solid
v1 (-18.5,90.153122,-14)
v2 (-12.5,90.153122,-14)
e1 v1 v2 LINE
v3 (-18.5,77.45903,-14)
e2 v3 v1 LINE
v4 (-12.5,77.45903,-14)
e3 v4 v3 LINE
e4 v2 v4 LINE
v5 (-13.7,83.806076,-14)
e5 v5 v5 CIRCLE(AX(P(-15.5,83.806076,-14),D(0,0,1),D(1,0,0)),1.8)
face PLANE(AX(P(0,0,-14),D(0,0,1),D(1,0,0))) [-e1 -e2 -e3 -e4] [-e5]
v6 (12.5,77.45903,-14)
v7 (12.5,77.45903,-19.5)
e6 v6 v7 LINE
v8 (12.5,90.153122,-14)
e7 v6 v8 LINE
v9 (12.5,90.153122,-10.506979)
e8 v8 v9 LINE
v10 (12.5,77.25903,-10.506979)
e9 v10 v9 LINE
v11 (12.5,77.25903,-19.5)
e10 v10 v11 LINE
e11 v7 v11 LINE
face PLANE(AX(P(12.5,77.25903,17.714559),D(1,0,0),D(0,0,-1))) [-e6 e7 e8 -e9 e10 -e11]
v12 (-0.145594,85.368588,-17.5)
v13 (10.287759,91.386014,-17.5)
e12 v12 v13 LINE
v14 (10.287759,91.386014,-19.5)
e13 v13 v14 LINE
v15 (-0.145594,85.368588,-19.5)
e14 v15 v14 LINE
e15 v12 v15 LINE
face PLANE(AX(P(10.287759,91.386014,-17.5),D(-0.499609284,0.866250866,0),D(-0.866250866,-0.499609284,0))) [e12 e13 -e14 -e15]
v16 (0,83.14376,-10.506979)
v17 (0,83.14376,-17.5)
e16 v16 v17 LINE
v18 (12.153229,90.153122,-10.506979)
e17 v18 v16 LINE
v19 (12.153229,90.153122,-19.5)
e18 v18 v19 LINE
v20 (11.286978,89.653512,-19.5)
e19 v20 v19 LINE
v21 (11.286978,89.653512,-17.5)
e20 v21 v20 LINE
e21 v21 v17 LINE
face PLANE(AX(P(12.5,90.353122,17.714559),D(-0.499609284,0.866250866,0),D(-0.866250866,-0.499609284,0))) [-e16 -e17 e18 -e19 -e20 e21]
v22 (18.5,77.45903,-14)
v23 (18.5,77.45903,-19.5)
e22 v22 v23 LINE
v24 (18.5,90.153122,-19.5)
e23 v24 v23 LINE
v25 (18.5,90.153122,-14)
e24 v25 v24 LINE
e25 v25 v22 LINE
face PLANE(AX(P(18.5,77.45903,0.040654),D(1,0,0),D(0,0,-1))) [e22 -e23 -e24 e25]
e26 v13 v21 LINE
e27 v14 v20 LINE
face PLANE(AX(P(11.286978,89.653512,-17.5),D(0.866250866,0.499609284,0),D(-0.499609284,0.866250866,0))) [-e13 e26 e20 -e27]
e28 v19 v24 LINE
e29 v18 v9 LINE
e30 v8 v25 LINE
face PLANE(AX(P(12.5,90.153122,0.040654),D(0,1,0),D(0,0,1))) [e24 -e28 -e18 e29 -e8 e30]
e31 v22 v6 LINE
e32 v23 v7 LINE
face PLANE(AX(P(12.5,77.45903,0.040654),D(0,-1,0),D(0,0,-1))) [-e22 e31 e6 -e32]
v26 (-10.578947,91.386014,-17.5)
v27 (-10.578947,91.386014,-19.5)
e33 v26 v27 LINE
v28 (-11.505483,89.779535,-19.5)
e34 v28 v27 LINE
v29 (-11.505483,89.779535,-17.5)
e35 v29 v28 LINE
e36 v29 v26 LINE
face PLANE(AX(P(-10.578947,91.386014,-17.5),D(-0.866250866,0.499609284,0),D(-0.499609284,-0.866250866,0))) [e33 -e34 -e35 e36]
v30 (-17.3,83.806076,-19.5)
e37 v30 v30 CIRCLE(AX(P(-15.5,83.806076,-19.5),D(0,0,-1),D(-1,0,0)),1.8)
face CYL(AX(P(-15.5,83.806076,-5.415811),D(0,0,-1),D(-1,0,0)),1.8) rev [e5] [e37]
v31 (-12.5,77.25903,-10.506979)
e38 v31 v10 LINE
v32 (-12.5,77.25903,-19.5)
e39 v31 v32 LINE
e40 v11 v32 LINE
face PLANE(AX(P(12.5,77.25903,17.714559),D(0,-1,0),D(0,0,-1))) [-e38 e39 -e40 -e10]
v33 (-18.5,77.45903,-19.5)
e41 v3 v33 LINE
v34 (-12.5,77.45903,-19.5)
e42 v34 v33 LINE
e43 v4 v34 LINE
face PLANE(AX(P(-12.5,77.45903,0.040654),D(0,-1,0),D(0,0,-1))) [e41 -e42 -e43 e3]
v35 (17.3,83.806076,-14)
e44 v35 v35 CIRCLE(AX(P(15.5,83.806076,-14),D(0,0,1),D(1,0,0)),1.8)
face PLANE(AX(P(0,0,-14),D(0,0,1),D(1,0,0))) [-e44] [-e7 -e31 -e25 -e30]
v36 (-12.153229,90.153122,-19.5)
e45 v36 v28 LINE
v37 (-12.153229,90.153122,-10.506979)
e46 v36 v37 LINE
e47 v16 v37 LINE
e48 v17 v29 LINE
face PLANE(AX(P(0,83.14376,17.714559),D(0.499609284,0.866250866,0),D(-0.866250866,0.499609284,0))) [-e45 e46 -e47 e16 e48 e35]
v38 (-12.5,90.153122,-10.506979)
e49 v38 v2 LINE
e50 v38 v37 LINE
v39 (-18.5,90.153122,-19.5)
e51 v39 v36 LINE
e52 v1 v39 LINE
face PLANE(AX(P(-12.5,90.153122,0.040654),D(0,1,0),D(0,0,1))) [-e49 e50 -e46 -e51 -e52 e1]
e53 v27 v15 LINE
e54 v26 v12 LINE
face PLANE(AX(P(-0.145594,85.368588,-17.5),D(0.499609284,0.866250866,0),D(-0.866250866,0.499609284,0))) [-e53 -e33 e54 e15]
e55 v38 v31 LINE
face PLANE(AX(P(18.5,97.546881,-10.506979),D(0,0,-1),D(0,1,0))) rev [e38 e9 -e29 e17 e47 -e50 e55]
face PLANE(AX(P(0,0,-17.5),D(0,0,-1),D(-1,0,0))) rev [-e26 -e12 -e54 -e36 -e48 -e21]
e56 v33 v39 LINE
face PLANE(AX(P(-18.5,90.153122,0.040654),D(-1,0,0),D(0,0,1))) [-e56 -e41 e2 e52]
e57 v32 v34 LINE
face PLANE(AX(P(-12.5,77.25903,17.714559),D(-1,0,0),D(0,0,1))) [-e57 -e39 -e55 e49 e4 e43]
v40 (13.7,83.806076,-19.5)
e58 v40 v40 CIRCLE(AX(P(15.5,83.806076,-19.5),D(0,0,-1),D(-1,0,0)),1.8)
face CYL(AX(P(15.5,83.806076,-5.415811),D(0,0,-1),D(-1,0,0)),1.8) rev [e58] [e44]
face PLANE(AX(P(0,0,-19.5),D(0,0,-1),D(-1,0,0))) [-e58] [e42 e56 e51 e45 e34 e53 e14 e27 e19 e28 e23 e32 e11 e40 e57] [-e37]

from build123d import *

# Parameters (mm, degrees)
SKETCH2_R               = 18.5
SKETCH2_R_2             = 1.8
BOSS_EXTRUDE1_DEPTH     = 3
SKETCH3_R               = 6.5
CUT_EXTRUDE1_DEPTH      = 3
BOSS_EXTRUDE2_START     = -3
BOSS_EXTRUDE2_DEPTH     = 3
SKETCH5_W               = 37
SKETCH5_H               = 5
BOSS_EXTRUDE3_DEPTH     = 90
SKETCH6_W               = 37
SKETCH6_H               = 15.5
BOSS_EXTRUDE4_DEPTH     = 5
SKETCH7_W               = 6
SKETCH7_H               = 20.5
BOSS_EXTRUDE5_DEPTH     = 20
SKETCH8_W               = 25
SKETCH8_H               = 15.5
CUT_EXTRUDE2_DEPTH      = 10
SKETCH9_W               = 25
SKETCH9_H               = 5
BOSS_EXTRUDE6_DEPTH     = 20
BOSS_EXTRUDE7_REACH     = 128.813
SKETCH10_W              = 5
SKETCH10_H              = 25
SKETCH11_W              = 25
SKETCH11_H              = 20
CUT_EXTRUDE3_DEPTH      = 137.880422267
SKETCH13_W              = 13
SKETCH13_H              = 60
CUT_EXTRUDE5_DEPTH      = 127.957670111
BOSS_EXTRUDE8_DEPTH     = 35
SKETCH16_W              = 37
SKETCH16_H              = 8
BOSS_EXTRUDE9_DEPTH     = 13
SKETCH17_W              = 37
SKETCH17_H              = 8
BOSS_EXTRUDE10_DEPTH    = 13
FILLET1_START           = -18.5
FILLET1_DEPTH           = 37
FILLET2_R               = 8
SKETCH18_W              = 37
SKETCH18_H              = 75
CUT_EXTRUDE6_DEPTH      = 0.001
SKETCH19_R              = 1.8
CUT_EXTRUDE7_DEPTH      = 6
SKETCH20_W              = 7
SKETCH20_H              = 5
CUT_EXTRUDE8_DEPTH      = 20
CUT_EXTRUDE9_DEPTH      = 127.957670111
CUT_EXTRUDE9_DEPTH_BACK = 127.957670111
CUT_EXTRUDE10_DEPTH     = 137.880422267
CUT_EXTRUDE11_DEPTH     = 15
BOSS_EXTRUDE11_DEPTH    = 7.5
BOSS_EXTRUDE12_DEPTH    = 7.5
SKETCH27_W              = 27
SKETCH27_H              = 53
CUT_EXTRUDE13_DEPTH     = 10
BOSS_EXTRUDE13_DEPTH    = 6.9930205
SKETCH29_W              = 6
SKETCH29_H              = 13.094091563
CUT_EXTRUDE14_DEPTH     = 3.5
SKETCH30_W              = 6
SKETCH30_H              = 12.694091563
BOSS_EXTRUDE14_DEPTH    = 3.5
CUT_EXTRUDE15_REACH     = 128.958
SKETCH31_W              = 3.5
SKETCH31_H              = 13.094091563
CUT_EXTRUDE16_START     = -6.993021
SKETCH32_R              = 1.8
CUT_EXTRUDE16_DEPTH     = 6.993021
SKETCH33_R              = 1.8
CUT_EXTRUDE17_DEPTH     = 3.4930205
SKETCH34_R              = 1.8
BOSS_EXTRUDE15_DEPTH    = 2
SKETCH35_W              = 37
SKETCH35_H              = 8.9930205
CUT_EXTRUDE18_DEPTH     = 2
BOSS_EXTRUDE16_DEPTH    = 2


with BuildPart() as part:
    # Sketch2 → Boss-Extrude1 (new body)
    with BuildSketch(Plane(origin=(0, 0, 0), x_dir=(1, 0, 0), z_dir=(0, 1, 0))):
        with Locations(Location((0, 0, 0), (0, 0, 270))):
            Circle(SKETCH2_R)
        with Locations(Location((-15.5, 0, 0), (0, 0, 270))):
            Circle(SKETCH2_R_2, mode=Mode.SUBTRACT)
        with Locations(Location((-7.75, 13.423393759, 0), (0, 0, 270))):
            Circle(SKETCH2_R_2, mode=Mode.SUBTRACT)
        with Locations(Location((7.75, 13.423393759, 0), (0, 0, 270))):
            Circle(SKETCH2_R_2, mode=Mode.SUBTRACT)
        with Locations(Location((15.5, 0, 0), (0, 0, 270))):
            Circle(SKETCH2_R_2, mode=Mode.SUBTRACT)
        with Locations(Location((7.75, -13.423393759, 0), (0, 0, 270))):
            Circle(SKETCH2_R_2, mode=Mode.SUBTRACT)
        with Locations(Location((-7.75, -13.423393759, 0), (0, 0, 270))):
            Circle(SKETCH2_R_2, mode=Mode.SUBTRACT)
    extrude(amount=BOSS_EXTRUDE1_DEPTH)

    # Sketch3 → Cut-Extrude1 (cut)
    with BuildSketch(Plane(origin=(0, 3, 0), x_dir=(1, 0, 0), z_dir=(0, 1, 0))):
        with Locations(Location((0, -7, 0), (0, 0, 270))):
            Circle(SKETCH3_R)
    extrude(amount=-CUT_EXTRUDE1_DEPTH, mode=Mode.SUBTRACT)

    # Sketch4 → Boss-Extrude2 (add)
    with BuildSketch(Plane(origin=(0, 3, 0), x_dir=(1, 0, 0), z_dir=(0, 1, 0)).offset(BOSS_EXTRUDE2_START)):
        with BuildLine():
            Line((18.5, 30.5), (-18.5, 30.5))
            Line((-18.5, 30.5), (-18.5, 0))
            ThreePointArc((-18.5, 0), (0, 18.5), (18.5, 0))
            Line((18.5, 0), (18.5, 30.5))
        make_face()
        with BuildLine():
            ThreePointArc((18.5, 0), (0, -18.5), (-18.5, 0))
            Line((-18.5, 0), (-18.5, -44.5))
            Line((-18.5, -44.5), (18.5, -44.5))
            Line((18.5, -44.5), (18.5, 0))
        make_face()
    extrude(amount=BOSS_EXTRUDE2_DEPTH)

    # Sketch5 → Boss-Extrude3 (add)
    with BuildSketch(Plane(origin=(0, 3, 0), x_dir=(1, 0, 0), z_dir=(0, 1, 0))):
        with Locations((0, 28)):
            Rectangle(SKETCH5_W, SKETCH5_H)
        with Locations((0, -42)):
            Rectangle(SKETCH5_W, SKETCH5_H)
    extrude(amount=BOSS_EXTRUDE3_DEPTH)

    # Sketch6 → Boss-Extrude4 (add)
    with BuildSketch(Plane(origin=(0, 93, 0), x_dir=(1, 0, 0), z_dir=(0, 1, 0))):
        with Locations((0, 17.75)):
            Rectangle(SKETCH6_W, SKETCH6_H)
        with Locations((0, -31.75)):
            Rectangle(SKETCH6_W, SKETCH6_H)
    extrude(amount=-BOSS_EXTRUDE4_DEPTH)

    # Sketch7 → Boss-Extrude5 (add)
    with BuildSketch(Plane(origin=(0, 93, 0), x_dir=(1, 0, 0), z_dir=(0, 1, 0))):
        with Locations((-15.5, 20.25)):
            Rectangle(SKETCH7_W, SKETCH7_H)
        with Locations((15.5, 20.25)):
            Rectangle(SKETCH7_W, SKETCH7_H)
        with Locations((-15.5, -34.25)):
            Rectangle(SKETCH7_W, SKETCH7_H)
        with Locations((15.5, -34.25)):
            Rectangle(SKETCH7_W, SKETCH7_H)
    extrude(amount=BOSS_EXTRUDE5_DEPTH)

    # Sketch8 → Cut-Extrude2 (cut)
    with BuildSketch(Plane(origin=(0, 93, 0), x_dir=(1, 0, 0), z_dir=(0, 1, 0))):
        with Locations((0, 17.75)):
            Rectangle(SKETCH8_W, SKETCH8_H)
        with Locations((0, -31.75)):
            Rectangle(SKETCH8_W, SKETCH8_H)
    extrude(amount=-CUT_EXTRUDE2_DEPTH, mode=Mode.SUBTRACT)

    # Sketch9 → Boss-Extrude6 (add)
    with BuildSketch(Plane(origin=(0, 93, 0), x_dir=(1, 0, 0), z_dir=(0, 1, 0))):
        with Locations((0, 28)):
            Rectangle(SKETCH9_W, SKETCH9_H)
        with Locations((0, -42)):
            Rectangle(SKETCH9_W, SKETCH9_H)
    extrude(amount=BOSS_EXTRUDE6_DEPTH)

    # Sketch10 → Boss-Extrude7 (add, up to next)
    with BuildSketch(Plane(origin=(0, 0, 24), x_dir=(-1, 0, 0), z_dir=(0, 0, -1)), mode=Mode.PRIVATE) as boss_extrude7_sk1:
        with Locations((16, 100.5)):
            Rectangle(SKETCH10_W, SKETCH10_H)
    boss_extrude7_tool1 = extrude(boss_extrude7_sk1.sketch, amount=BOSS_EXTRUDE7_REACH, mode=Mode.PRIVATE) - part.part
    # Sketch10 → Boss-Extrude7 (add, up to next)
    with BuildSketch(Plane(origin=(0, 0, 24), x_dir=(-1, 0, 0), z_dir=(0, 0, -1)), mode=Mode.PRIVATE) as boss_extrude7_sk2:
        with Locations((-16, 100.5)):
            Rectangle(SKETCH10_W, SKETCH10_H)
    boss_extrude7_tool2 = extrude(boss_extrude7_sk2.sketch, amount=BOSS_EXTRUDE7_REACH, mode=Mode.PRIVATE) - part.part
    add(boss_extrude7_tool1.solids().sort_by_distance((-16, 100.5, 24))[0])
    add(boss_extrude7_tool2.solids().sort_by_distance((16, 100.5, 24))[0])

    # Sketch11 → Cut-Extrude3 (cut, through all)
    with BuildSketch(Plane.XY.offset(44.5)):
        with Locations((0, 103)):
            Rectangle(SKETCH11_W, SKETCH11_H)
    extrude(amount=-CUT_EXTRUDE3_DEPTH, mode=Mode.SUBTRACT)

    # Sketch13 → Cut-Extrude5 (cut, through all)
    with BuildSketch(Plane(origin=(18.5, 0, 0), x_dir=(0, 0, -1), z_dir=(1, 0, 0))):
        with Locations((-38, 83)):
            Rectangle(SKETCH13_W, SKETCH13_H)
        with Locations((24, 83)):
            Rectangle(SKETCH13_W, SKETCH13_H)
    extrude(amount=-CUT_EXTRUDE5_DEPTH, mode=Mode.SUBTRACT)


with BuildPart() as cut_extrude5_piece_1:
    # of the separate pieces the step leaves, piece 1, a body of its own (cut_extrude5_pieces)
    add(part.part.solids().sort_by_distance((-7.75, 0, 15.223393759))[0])



with BuildPart() as cut_extrude5_piece_2:
    # of the separate pieces the step leaves, piece 2, a body of its own (cut_extrude5_pieces)
    add(part.part.solids().sort_by_distance((-18.5, 113, 31.5))[0])



with BuildPart() as cut_extrude5_piece_3:
    # of the separate pieces the step leaves, piece 3, a body of its own (cut_extrude5_pieces)
    add(part.part.solids().sort_by_distance((18.5, 113, 31.5))[0])


with BuildPart() as cut_extrude5_piece_2_1:
    add(cut_extrude5_piece_2.part)

    add(cut_extrude5_piece_3.part)  # Boss-Extrude8 merges Cut-Extrude5 piece 3
    # Sketch14 → Boss-Extrude8 (add)
    with BuildSketch(Plane.XZ.offset(-88)):
        Polygon((18.5, -17.5), (18.5, 31.5), (12.5, 31.5), (12.5, 24), (13.5, 24), (13.5, -10), (12.5, -10), (12.5, -17.5), align=None)
        Polygon((-12.5, 31.5), (-18.5, 31.5), (-18.5, -17.5), (-12.5, -17.5), (-12.5, -10), (-13.5, -10), (-13.5, 24), (-12.5, 24), align=None)
    extrude(amount=BOSS_EXTRUDE8_DEPTH)


with BuildPart() as cut_extrude5_piece_1_1:
    add(cut_extrude5_piece_1.part)

    add(cut_extrude5_piece_2_1.part)  # Boss-Extrude9 merges Cut-Extrude5 piece 2
    # Sketch16 → Boss-Extrude9 (add)
    with BuildSketch(Plane.XY.offset(31.5)):
        with Locations((0, 57)):
            Rectangle(SKETCH16_W, SKETCH16_H)
    extrude(amount=BOSS_EXTRUDE9_DEPTH)

    # Sketch17 → Boss-Extrude10 (add)
    with BuildSketch(Plane(origin=(0, 0, -17.5), x_dir=(-1, 0, 0), z_dir=(0, 0, -1))):
        with Locations((0, 57)):
            Rectangle(SKETCH17_W, SKETCH17_H)
    extrude(amount=BOSS_EXTRUDE10_DEPTH)

    # Fillet1: read off the stored shape, not the designer's step
    # Fillet1 outline → Fillet1 (add)
    with BuildSketch(Plane.YZ.offset(FILLET1_START)):
        with BuildLine():
            ThreePointArc((45, 39.5), (50.656854249, 37.156854249), (53, 31.5))
            Line((53, 31.5), (53, 39.5))
            Line((53, 39.5), (45, 39.5))
        make_face()
        with BuildLine():
            ThreePointArc((53, -17.5), (50.656854249, -23.156854249), (45, -25.5))
            Line((45, -25.5), (53, -25.5))
            Line((53, -25.5), (53, -17.5))
        make_face()
    extrude(amount=FILLET1_DEPTH)

    # Fillet2
    fillet2_edges = [cut_extrude5_piece_1_1.edges().sort_by_distance(p)[0] for p in [
        (15.5, 61, 31.5),
        (-15.5, 61, 31.5),
        (-15.5, 61, -17.5),
        (15.5, 61, -17.5),
    ]]
    fillet(fillet2_edges, radius=FILLET2_R)

    # Sketch18 → Cut-Extrude6 (cut)
    with BuildSketch(Plane(origin=(0, 3, 0), x_dir=(1, 0, 0), z_dir=(0, 1, 0))):
        with Locations((0, -7)):
            Rectangle(SKETCH18_W, SKETCH18_H)
    extrude(amount=CUT_EXTRUDE6_DEPTH, mode=Mode.SUBTRACT)


with BuildPart() as cut_extrude6_piece_1:
    # of the separate pieces the step leaves, piece 1, a body of its own (cut_extrude6_pieces)
    add(cut_extrude5_piece_1_1.part.solids().sort_by_distance((18.5, 61, 39.5))[0])


with BuildPart() as cut_extrude6_piece_2:
    # of the separate pieces the step leaves, piece 2, a body of its own (cut_extrude6_pieces)
    add(cut_extrude5_piece_1_1.part.solids().sort_by_distance((18.5, 3, 44.5))[0])


with BuildPart() as cut_extrude7_tool:
    # Sketch19 → Cut-Extrude7 (new body)
    with BuildSketch(Plane.XZ):
        with Locations(Location((-10, 42, 0), (0, 0, 270))):
            Circle(SKETCH19_R)
        with Locations(Location((10, 42, 0), (0, 0, 270))):
            Circle(SKETCH19_R)
        with Locations(Location((-10, -28, 0), (0, 0, 270))):
            Circle(SKETCH19_R)
        with Locations(Location((10, -28, 0), (0, 0, 270))):
            Circle(SKETCH19_R)
    extrude(amount=-CUT_EXTRUDE7_DEPTH)


with BuildPart() as cut_extrude6_piece_1_1:
    add(cut_extrude6_piece_1.part)

    # Cut-Extrude7: cut by cut_extrude7_tool
    add(cut_extrude7_tool.part, mode=Mode.SUBTRACT)

    # Sketch20 → Cut-Extrude8 (cut)
    with BuildSketch(Plane.XZ.offset(-6)):
        with Locations((-10, 42)):
            Rectangle(SKETCH20_W, SKETCH20_H)
        with Locations((10, 42)):
            Rectangle(SKETCH20_W, SKETCH20_H)
        with Locations((-10, -28)):
            Rectangle(SKETCH20_W, SKETCH20_H)
        with Locations((10, -28)):
            Rectangle(SKETCH20_W, SKETCH20_H)
    extrude(amount=-CUT_EXTRUDE8_DEPTH, mode=Mode.SUBTRACT)

    # Sketch21 → Cut-Extrude9 (cut, two sides: drawn at the far end of the back side and taken through both)
    with BuildSketch(Plane.ZY.offset(18.5).offset(-CUT_EXTRUDE9_DEPTH_BACK)):
        Polygon((-10.5069795, 97.546881465), (-10.5069795, 65.615135764), (5.458893351, 81.581008614), align=None)
        Polygon((24.5069795, 65.615135764), (8.541106649, 81.581008614), (24.5069795, 97.546881465), align=None)
        Polygon((-11.485209662, 61.67963441), (25.485209662, 61.67963441), (7, 77.078778227), align=None)
        Polygon((-9.842977491, 104.297173092), (23.842977491, 104.297173092), (7, 84.078778227), align=None)
    extrude(amount=CUT_EXTRUDE9_DEPTH + CUT_EXTRUDE9_DEPTH_BACK, mode=Mode.SUBTRACT)

    # Sketch22 → Cut-Extrude10 (cut, through all)
    with BuildSketch(Plane(origin=(0, 0, -30.5), x_dir=(-1, 0, 0), z_dir=(0, 0, -1))):
        Polygon((-13.5, 52.097217271), (-3, 41.509793962), (-13.5, 30.922370653), align=None)
        Polygon((3, 41.509793962), (13.5, 30.922370653), (13.5, 52.097217271), align=None)
        Polygon((-9.527716063, 30.922370653), (10.12909946, 30.922370653), (0, 40.845941529), align=None)
        Polygon((10.12909946, 52.097217271), (0, 42.173646395), (-9.527716063, 52.097217271), align=None)
    extrude(amount=-CUT_EXTRUDE10_DEPTH, mode=Mode.SUBTRACT)

    # Sketch25 → Boss-Extrude11 (add)
    with BuildSketch(Plane(origin=(0, 0, -17.5), x_dir=(-1, 0, 0), z_dir=(0, 0, -1))):
        Polygon((-12.5, 113), (12.5, 113), (12.5, 104.783121635), (0, 112), (-12.5, 104.783121635), align=None)
    extrude(amount=-BOSS_EXTRUDE11_DEPTH)

    # Sketch26 → Boss-Extrude12 (add)
    with BuildSketch(Plane.XY.offset(31.5)):
        Polygon((0, 112), (-12.5, 104.783121635), (-12.5, 113), (12.5, 113), (12.5, 104.783121635), align=None)
    extrude(amount=-BOSS_EXTRUDE12_DEPTH)

    # Sketch27 → Cut-Extrude13 (cut)
    with BuildSketch(Plane(origin=(0, 61, 0), x_dir=(1, 0, 0), z_dir=(0, 1, 0))):
        with Locations((0, -7)):
            Rectangle(SKETCH27_W, SKETCH27_H)
    extrude(amount=-CUT_EXTRUDE13_DEPTH, mode=Mode.SUBTRACT)

    # Sketch29 → Cut-Extrude14 (cut)
    with BuildSketch(Plane(origin=(0, 0, -17.5), x_dir=(-1, 0, 0), z_dir=(0, 0, -1))):
        with Locations((-15.5, 83.806075854)):
            Rectangle(SKETCH29_W, SKETCH29_H)
        with Locations((15.5, 83.806075854)):
            Rectangle(SKETCH29_W, SKETCH29_H)
    extrude(amount=-CUT_EXTRUDE14_DEPTH, mode=Mode.SUBTRACT)

    # Cut-Extrude15: up to this face of the body (flat: up to its plane)
    cut_extrude15_end = Plane(cut_extrude6_piece_1_1.part.faces().sort_by_distance((-18.5, 59.668655567, -28))[0])
    # Sketch31 → Cut-Extrude15 (cut, up to the picked face)
    with BuildSketch(Plane(origin=(18.5, 0, 0), x_dir=(0, 0, -1), z_dir=(1, 0, 0)), mode=Mode.PRIVATE) as cut_extrude15_sk1:
        with Locations((-29.75, 83.806075854)):
            Rectangle(SKETCH31_W, SKETCH31_H)
    cut_extrude15_tool1 = split(extrude(cut_extrude15_sk1.sketch, amount=-CUT_EXTRUDE15_REACH, mode=Mode.PRIVATE), bisect_by=cut_extrude15_end, keep=Keep.BOTH, mode=Mode.PRIVATE)
    add(cut_extrude15_tool1.solids().sort_by(Axis((18.5, 83.806076, 29.75), (-1, 0, 0)))[0], mode=Mode.SUBTRACT)


with BuildPart() as cut_extrude6_piece_2_1:
    add(cut_extrude6_piece_2.part)

    # Cut-Extrude7: cut by cut_extrude7_tool
    add(cut_extrude7_tool.part, mode=Mode.SUBTRACT)

    # Sketch23 → Cut-Extrude11 (cut)
    with BuildSketch(Plane.XZ):
        Polygon((-11.504954321, 36.262601208), (12.40534205, 36.262601208), (0.450193865, 27.658896237), align=None)
        Polygon((0.450193865, 25.758077697), (-11.504954321, 17.154372727), (12.40534205, 17.154372727), align=None)
        Polygon((-14.846233134, 34.405096401), (-14.846233134, 19.011877534), (-4.15152584, 26.708486967), align=None)
        Polygon((15.746620863, 19.011877534), (5.051913569, 26.708486967), (15.746620863, 34.405096401), align=None)
    extrude(amount=-CUT_EXTRUDE11_DEPTH, mode=Mode.SUBTRACT)


with BuildPart() as body_3:
    # Sketch28 → Boss-Extrude13 (new body)
    with BuildSketch(Plane(origin=(0, 0, -17.5), x_dir=(-1, 0, 0), z_dir=(0, 0, -1))):
        Polygon((-12.5, 90.353121635), (0, 83.143759666), (12.5, 90.353121635), (12.5, 77.259030072), (-12.5, 77.259030072), align=None)
    extrude(amount=-BOSS_EXTRUDE13_DEPTH)

    # Sketch30 → Boss-Extrude14 (add)
    with BuildSketch(Plane(origin=(0, 0, -17.5), x_dir=(-1, 0, 0), z_dir=(0, 0, -1))):
        with Locations((-15.5, 83.806075854)):
            Rectangle(SKETCH30_W, SKETCH30_H)
        with Locations((15.5, 83.806075854)):
            Rectangle(SKETCH30_W, SKETCH30_H)
    extrude(amount=-BOSS_EXTRUDE14_DEPTH)


with BuildPart() as cut_extrude16_tool:
    # Sketch32 → Cut-Extrude16 (new body)
    with BuildSketch(Plane(origin=(0, 0, -17.5), x_dir=(-1, 0, 0), z_dir=(0, 0, -1)).offset(CUT_EXTRUDE16_START)):
        with Locations((-15.5, 83.806075854)):
            Circle(SKETCH32_R)
        with Locations(Location((15.5, 83.806075854, 0), (0, 0, 180))):
            Circle(SKETCH32_R)
    extrude(amount=CUT_EXTRUDE16_DEPTH)


with BuildPart() as cut_extrude6_piece_1_2:
    add(cut_extrude6_piece_1_1.part)

    # Cut-Extrude16: cut by cut_extrude16_tool
    add(cut_extrude16_tool.part, mode=Mode.SUBTRACT)

    # Sketch33 → Cut-Extrude17 (cut)
    with BuildSketch(Plane.XY.offset(28)):
        with Locations((-15.5, 83.806075854)):
            Circle(SKETCH33_R)
        with Locations(Location((15.5, 83.806075854, 0), (0, 0, 180))):
            Circle(SKETCH33_R)
    extrude(amount=-CUT_EXTRUDE17_DEPTH, mode=Mode.SUBTRACT)


with BuildPart() as body_3_1:
    add(body_3.part)

    # Cut-Extrude16: cut by cut_extrude16_tool
    add(cut_extrude16_tool.part, mode=Mode.SUBTRACT)

    # Sketch34 → Boss-Extrude15 (add)
    with BuildSketch(Plane(origin=(0, 0, -17.5), x_dir=(-1, 0, 0), z_dir=(0, 0, -1))):
        Polygon((-12.5, 90.353121635), (-12.5, 90.153121635), (-18.5, 90.153121635), (-18.5, 77.459030072), (-12.5, 77.459030072), (-12.5, 77.259030072), (12.5, 77.259030072), (12.5, 77.459030072), (18.5, 77.459030072), (18.5, 90.153121635), (12.5, 90.153121635), (12.5, 90.353121635), (0, 83.143759666), align=None)
        with Locations((15.5, 83.806075854)):
            Circle(SKETCH34_R, mode=Mode.SUBTRACT)
        with Locations((-15.5, 83.806075854)):
            Circle(SKETCH34_R, mode=Mode.SUBTRACT)
    extrude(amount=BOSS_EXTRUDE15_DEPTH)

    # Sketch35 → Cut-Extrude18 (cut)
    with BuildSketch(Plane(origin=(0, 90.153121635, 0), x_dir=(1, 0, 0), z_dir=(0, 1, 0))):
        with Locations((0, 15.00348975)):
            Rectangle(SKETCH35_W, SKETCH35_H)
    extrude(amount=CUT_EXTRUDE18_DEPTH, mode=Mode.SUBTRACT)

    # Sketch36 → Boss-Extrude16 (add)
    with BuildSketch(Plane(origin=(0, 0, -19.5), x_dir=(-1, 0, 0), z_dir=(0, 0, -1))):
        Polygon((-11.286977809, 89.653512351), (-10.287759241, 91.386014084), (0.145594128, 85.368588405), (10.578947497, 91.386014084), (11.505482728, 89.779534835), (0, 83.143759666), align=None)
    extrude(amount=-BOSS_EXTRUDE16_DEPTH)


solid = body_3_1.part
